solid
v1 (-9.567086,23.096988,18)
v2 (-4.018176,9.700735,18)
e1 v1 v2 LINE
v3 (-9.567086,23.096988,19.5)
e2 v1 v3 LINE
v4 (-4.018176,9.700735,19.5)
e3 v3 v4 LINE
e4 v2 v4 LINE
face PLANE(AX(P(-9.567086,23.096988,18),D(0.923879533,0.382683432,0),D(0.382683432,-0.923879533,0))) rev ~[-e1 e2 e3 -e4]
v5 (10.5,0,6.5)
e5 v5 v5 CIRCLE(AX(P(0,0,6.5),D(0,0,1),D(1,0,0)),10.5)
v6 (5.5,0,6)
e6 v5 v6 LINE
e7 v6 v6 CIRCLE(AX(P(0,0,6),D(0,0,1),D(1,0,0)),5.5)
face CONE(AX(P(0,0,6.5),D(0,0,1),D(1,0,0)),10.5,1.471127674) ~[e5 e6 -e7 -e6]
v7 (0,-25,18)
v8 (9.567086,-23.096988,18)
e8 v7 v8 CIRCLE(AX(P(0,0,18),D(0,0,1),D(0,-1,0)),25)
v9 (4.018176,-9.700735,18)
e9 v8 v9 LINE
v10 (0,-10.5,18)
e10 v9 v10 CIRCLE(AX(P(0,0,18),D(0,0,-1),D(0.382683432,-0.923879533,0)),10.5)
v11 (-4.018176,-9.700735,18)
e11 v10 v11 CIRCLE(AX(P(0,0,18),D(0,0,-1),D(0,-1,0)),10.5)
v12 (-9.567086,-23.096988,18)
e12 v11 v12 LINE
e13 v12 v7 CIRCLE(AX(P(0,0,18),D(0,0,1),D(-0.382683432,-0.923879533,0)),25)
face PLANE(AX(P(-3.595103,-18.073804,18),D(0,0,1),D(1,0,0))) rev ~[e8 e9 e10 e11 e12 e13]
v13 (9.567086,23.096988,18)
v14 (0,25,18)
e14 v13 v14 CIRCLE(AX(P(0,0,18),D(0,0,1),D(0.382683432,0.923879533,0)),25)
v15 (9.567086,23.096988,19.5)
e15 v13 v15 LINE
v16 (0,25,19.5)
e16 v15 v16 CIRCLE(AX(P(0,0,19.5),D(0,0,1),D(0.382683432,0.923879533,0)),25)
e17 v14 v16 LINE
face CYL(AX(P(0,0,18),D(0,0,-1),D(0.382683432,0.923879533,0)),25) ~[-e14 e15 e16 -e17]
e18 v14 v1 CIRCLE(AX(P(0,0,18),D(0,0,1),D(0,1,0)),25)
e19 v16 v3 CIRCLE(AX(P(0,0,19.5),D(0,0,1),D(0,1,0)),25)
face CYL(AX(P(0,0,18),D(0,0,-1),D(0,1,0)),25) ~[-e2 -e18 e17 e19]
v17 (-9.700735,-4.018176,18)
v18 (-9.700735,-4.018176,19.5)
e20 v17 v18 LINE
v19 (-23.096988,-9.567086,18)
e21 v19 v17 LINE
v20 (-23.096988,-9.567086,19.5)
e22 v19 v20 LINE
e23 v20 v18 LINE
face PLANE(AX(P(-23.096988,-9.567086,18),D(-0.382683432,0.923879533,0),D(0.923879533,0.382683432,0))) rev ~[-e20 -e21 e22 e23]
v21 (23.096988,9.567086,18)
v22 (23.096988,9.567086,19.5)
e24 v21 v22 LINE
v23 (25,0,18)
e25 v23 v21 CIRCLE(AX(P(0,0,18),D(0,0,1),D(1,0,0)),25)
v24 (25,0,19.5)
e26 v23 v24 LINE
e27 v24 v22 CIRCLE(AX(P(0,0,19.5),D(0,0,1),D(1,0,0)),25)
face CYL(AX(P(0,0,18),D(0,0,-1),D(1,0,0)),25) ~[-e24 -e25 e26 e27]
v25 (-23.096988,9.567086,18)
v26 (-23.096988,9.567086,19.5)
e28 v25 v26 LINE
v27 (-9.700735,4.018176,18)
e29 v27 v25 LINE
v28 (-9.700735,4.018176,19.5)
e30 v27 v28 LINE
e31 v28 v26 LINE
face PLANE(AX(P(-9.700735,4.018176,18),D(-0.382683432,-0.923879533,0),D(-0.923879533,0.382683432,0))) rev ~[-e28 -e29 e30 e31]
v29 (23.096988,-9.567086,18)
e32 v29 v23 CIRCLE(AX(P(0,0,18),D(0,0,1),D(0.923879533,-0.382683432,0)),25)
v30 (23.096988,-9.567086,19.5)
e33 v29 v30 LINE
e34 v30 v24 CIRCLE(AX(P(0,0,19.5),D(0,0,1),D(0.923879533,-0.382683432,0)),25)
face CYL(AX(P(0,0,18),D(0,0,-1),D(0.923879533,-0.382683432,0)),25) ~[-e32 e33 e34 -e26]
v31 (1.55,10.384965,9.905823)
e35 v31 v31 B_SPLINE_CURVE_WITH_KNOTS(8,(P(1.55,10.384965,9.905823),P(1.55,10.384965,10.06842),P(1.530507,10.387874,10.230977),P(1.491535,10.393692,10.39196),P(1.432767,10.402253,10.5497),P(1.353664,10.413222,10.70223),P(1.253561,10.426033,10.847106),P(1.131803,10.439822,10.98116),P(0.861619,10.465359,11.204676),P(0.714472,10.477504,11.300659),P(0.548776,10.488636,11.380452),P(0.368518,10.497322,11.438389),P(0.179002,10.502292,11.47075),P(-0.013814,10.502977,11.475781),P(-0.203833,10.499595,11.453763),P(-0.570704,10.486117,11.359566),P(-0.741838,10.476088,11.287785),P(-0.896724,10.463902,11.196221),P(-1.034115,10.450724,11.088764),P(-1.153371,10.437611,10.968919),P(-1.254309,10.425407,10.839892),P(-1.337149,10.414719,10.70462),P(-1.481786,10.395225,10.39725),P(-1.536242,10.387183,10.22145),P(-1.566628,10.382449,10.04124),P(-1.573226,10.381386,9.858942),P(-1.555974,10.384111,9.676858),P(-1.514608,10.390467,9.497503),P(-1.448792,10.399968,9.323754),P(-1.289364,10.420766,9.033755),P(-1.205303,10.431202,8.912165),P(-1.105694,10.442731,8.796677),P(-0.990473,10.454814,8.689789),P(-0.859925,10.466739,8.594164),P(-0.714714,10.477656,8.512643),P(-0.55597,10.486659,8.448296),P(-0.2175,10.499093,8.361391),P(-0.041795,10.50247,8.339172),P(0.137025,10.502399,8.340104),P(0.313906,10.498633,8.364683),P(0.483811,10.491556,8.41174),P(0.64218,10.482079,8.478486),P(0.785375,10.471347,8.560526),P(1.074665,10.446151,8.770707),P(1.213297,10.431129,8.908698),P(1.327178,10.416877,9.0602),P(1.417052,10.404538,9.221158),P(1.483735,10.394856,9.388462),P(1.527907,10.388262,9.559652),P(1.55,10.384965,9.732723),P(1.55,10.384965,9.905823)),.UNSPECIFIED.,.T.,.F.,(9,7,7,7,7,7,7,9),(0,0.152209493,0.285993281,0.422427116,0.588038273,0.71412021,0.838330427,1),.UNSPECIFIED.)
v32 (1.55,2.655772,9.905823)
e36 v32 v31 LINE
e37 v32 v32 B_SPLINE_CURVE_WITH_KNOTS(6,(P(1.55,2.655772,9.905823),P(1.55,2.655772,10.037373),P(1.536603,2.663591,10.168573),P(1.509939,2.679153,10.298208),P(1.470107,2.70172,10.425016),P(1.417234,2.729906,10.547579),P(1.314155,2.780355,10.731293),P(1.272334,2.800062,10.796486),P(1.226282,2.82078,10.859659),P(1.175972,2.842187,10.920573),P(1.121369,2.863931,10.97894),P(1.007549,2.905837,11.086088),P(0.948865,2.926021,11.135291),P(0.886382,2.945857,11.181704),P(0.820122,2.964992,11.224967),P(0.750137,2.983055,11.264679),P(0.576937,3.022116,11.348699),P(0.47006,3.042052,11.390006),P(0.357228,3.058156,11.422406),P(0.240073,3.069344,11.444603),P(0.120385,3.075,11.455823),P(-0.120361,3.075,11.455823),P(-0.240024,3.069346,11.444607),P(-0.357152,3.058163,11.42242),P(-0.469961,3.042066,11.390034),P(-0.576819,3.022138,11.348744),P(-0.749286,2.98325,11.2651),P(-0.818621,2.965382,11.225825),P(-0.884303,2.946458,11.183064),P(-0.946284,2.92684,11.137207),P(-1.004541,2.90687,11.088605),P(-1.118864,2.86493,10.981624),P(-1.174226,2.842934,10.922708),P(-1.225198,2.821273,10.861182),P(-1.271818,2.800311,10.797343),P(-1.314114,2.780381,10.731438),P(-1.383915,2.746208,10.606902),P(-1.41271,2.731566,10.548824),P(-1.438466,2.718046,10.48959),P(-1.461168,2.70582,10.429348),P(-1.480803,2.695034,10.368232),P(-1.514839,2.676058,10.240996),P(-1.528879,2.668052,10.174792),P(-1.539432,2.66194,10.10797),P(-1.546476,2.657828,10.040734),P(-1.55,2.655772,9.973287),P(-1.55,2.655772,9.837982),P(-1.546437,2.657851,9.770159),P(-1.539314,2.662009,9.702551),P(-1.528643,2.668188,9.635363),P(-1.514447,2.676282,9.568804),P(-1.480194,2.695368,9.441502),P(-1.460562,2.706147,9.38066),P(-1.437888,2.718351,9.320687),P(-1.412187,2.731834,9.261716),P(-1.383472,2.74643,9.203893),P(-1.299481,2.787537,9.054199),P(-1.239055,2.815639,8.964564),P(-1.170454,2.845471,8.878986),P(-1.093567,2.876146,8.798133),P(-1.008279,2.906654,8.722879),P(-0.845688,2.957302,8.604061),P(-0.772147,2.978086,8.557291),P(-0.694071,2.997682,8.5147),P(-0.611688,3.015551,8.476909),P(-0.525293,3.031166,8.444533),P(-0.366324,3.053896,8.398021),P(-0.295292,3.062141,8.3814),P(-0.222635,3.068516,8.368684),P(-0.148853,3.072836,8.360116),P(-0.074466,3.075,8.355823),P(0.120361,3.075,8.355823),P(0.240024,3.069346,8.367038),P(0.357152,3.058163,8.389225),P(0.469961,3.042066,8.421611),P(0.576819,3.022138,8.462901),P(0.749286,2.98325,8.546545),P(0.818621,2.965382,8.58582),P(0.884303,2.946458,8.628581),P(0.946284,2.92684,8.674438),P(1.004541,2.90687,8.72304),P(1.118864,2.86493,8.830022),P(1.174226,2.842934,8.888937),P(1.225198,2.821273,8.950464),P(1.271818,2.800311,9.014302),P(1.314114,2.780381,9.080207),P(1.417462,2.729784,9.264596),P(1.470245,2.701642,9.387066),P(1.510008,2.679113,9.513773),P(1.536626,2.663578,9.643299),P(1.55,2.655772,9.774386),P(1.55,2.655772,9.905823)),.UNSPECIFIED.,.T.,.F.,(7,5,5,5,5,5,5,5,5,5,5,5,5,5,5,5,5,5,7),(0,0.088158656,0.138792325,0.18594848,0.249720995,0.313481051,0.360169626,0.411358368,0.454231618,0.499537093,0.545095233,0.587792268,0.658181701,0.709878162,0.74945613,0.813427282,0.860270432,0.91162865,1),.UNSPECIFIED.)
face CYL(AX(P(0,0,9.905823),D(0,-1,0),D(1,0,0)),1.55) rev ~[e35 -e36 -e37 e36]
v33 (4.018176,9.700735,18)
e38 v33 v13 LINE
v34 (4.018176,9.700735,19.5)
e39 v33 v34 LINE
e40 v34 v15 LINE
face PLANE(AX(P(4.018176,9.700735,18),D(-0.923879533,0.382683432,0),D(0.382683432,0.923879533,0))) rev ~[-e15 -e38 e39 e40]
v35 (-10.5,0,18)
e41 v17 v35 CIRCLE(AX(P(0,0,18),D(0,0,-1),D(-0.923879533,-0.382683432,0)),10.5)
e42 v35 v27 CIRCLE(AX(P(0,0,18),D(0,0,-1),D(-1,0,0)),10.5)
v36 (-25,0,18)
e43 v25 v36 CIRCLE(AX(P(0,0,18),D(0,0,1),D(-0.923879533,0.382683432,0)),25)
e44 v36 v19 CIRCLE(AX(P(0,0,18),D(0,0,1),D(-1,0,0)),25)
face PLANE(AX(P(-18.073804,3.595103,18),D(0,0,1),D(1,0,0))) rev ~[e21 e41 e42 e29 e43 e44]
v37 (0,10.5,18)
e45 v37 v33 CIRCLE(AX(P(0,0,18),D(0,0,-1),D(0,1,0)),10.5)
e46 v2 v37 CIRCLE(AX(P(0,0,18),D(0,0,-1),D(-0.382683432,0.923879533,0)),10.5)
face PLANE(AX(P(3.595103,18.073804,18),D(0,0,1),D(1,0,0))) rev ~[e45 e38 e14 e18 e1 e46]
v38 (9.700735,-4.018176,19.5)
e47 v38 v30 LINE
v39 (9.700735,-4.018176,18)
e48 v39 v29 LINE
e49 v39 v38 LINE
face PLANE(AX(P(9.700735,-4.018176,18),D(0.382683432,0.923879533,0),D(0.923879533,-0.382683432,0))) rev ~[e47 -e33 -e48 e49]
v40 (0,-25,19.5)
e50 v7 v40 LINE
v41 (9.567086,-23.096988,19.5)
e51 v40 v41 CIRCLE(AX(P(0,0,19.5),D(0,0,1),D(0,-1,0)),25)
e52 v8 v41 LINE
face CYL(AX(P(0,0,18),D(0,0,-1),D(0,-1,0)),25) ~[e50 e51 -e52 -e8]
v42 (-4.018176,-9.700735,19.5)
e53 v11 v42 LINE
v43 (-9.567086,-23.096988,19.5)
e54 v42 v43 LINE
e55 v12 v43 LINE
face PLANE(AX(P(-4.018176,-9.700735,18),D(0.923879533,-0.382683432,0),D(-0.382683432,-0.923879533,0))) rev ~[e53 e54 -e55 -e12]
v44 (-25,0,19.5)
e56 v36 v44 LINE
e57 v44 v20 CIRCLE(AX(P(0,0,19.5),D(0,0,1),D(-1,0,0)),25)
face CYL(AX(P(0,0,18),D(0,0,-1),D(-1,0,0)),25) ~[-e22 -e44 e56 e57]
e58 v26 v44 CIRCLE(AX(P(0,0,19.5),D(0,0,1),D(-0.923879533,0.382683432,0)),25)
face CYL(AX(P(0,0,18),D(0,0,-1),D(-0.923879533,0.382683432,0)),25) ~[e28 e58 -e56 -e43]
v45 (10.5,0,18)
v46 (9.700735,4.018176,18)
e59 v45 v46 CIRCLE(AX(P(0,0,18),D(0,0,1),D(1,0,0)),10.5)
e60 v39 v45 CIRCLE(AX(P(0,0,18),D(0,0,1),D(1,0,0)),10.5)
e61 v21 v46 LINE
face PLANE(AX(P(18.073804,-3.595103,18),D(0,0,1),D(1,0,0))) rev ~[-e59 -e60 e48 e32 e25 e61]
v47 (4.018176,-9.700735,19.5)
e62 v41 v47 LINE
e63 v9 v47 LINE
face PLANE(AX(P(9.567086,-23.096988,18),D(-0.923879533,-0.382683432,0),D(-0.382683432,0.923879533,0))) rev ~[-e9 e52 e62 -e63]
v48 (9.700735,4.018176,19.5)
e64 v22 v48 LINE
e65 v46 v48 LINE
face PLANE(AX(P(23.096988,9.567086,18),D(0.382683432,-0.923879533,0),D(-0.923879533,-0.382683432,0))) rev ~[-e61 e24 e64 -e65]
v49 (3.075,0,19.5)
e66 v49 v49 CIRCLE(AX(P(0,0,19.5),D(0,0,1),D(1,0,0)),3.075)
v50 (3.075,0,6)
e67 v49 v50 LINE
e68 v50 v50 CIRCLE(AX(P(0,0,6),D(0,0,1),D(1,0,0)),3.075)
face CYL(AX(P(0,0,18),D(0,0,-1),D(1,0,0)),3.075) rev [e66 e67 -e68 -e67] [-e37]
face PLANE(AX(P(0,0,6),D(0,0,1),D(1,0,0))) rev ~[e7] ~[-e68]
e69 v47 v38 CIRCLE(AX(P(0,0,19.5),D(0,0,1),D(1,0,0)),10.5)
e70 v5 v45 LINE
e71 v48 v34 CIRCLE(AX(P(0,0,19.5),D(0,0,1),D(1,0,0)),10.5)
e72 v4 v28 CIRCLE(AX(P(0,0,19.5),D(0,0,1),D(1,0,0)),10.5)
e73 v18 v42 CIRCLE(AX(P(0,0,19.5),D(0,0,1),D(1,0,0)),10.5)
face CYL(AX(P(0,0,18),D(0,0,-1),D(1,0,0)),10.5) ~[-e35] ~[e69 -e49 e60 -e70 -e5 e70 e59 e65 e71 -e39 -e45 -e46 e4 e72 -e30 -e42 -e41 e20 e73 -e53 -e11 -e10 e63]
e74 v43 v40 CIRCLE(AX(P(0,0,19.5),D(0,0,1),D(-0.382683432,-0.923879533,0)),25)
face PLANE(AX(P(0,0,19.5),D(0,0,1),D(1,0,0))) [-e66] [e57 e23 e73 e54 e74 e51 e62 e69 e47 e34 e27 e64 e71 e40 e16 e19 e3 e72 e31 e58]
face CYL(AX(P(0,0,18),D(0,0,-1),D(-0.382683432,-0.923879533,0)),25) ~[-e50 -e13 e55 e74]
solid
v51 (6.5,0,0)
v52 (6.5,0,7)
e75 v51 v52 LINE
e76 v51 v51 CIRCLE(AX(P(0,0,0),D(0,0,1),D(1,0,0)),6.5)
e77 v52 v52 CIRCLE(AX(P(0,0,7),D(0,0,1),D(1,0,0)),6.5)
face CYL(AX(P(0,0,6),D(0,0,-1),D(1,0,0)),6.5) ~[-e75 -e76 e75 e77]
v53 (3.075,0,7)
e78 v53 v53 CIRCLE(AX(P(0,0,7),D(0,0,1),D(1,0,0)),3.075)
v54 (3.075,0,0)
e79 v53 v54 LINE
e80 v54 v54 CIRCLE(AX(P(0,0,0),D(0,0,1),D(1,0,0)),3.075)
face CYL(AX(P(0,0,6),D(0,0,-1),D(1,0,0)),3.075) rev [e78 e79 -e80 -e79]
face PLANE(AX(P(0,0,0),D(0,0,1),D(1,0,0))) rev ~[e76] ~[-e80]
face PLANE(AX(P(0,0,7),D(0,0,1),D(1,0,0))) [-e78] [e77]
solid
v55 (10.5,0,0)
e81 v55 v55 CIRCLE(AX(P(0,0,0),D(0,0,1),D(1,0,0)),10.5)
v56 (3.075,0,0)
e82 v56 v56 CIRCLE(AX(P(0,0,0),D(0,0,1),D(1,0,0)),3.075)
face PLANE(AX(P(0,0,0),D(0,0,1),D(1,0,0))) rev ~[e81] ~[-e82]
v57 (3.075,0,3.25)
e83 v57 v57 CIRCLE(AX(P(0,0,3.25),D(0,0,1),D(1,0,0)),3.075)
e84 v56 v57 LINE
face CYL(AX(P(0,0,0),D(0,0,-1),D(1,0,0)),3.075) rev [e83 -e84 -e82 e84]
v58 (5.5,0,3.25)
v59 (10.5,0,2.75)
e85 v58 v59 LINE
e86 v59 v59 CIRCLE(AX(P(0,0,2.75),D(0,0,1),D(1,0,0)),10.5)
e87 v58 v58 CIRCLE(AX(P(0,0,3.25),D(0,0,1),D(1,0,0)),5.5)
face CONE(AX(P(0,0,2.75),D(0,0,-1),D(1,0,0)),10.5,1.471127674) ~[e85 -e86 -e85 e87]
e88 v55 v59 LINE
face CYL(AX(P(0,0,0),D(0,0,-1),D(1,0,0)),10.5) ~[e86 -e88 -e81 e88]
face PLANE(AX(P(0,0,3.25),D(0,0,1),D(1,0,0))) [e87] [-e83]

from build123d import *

# Parameters (mm, degrees)
F0_R      = 10.5
F0_R_2    = 6.5
F0_R_3    = 3.075
F1_DEPTH  = 3.25
F2_DEPTH  = 6
F3_R      = 10.5
F3_R_2    = 6.5
F3_R_3    = 3.075
F4_DEPTH  = 12
F6_DEPTH  = 1.5
F7_DEPTH  = 1.5
F8_R      = 1.55
F9_DEPTH  = 20
F10_SIZE2 = 0.5
F10_SIZE  = 5
F11_SIZE2 = 5
F11_SIZE  = 0.5
F12_DEPTH = 1


with BuildPart() as f1:
    # F0 (on Top) → F1 (new body)
    with BuildSketch(Plane.XY):
        Circle(F0_R)
        Circle(F0_R_2, mode=Mode.SUBTRACT)
        Circle(F0_R_2)
        Circle(F0_R_3, mode=Mode.SUBTRACT)
    extrude(amount=F1_DEPTH)

    # F10
    f10_edges = [f1.edges().sort_by_distance(p)[0] for p in [
        (-10.5, 0, 3.25),
    ]]
    f10_side = f1.faces().sort_by_distance((-3.371985, 0, 3.25))[0]
    chamfer(f10_edges, length=F10_SIZE, length2=F10_SIZE2, reference=f10_side)


with BuildPart() as f2:
    # F0 (on Top) → F2 (new body)
    with BuildSketch(Plane.XY):
        Circle(F0_R_2)
        Circle(F0_R_3, mode=Mode.SUBTRACT)
    extrude(amount=F2_DEPTH)

    # F12 (add): a face of the model
    f12_faces = [f2.faces().sort_by_distance(p)[0] for p in [
        (-6.3161522369, 0, 6),
    ]]
    extrude(f12_faces, amount=F12_DEPTH)


with BuildPart() as f4:
    # F3 (on face) → F4 (new body)
    with BuildSketch(Plane.XY.offset(6)):
        Circle(F3_R)
        Circle(F3_R_2, mode=Mode.SUBTRACT)
        Circle(F3_R_2)
        Circle(F3_R_3, mode=Mode.SUBTRACT)
    extrude(amount=F4_DEPTH)

    # F5 (on face) → F6 (join)
    with BuildSketch(Plane.XY.offset(18)):
        with BuildLine():
            Line((-25, 0), (-10.5, 0))
            ThreePointArc((-10.5, 0), (-10.2982454442, 2.0484483812), (-9.7007350914, 4.0181760398))
            Line((-9.7007350914, 4.0181760398), (-23.0969883128, 9.5670858091))
            ThreePointArc((-23.0969883128, 9.5670858091), (-24.5196320101, 4.8772580504), (-25, 0))
        make_face()
        with BuildLine():
            ThreePointArc((-9.7007350914, -4.0181760398), (-10.2982454442, -2.0484483812), (-10.5, 0))
            Line((-10.5, 0), (-25, 0))
            ThreePointArc((-25, 0), (-24.5196320101, -4.8772580504), (-23.0969883128, -9.5670858091))
            Line((-23.0969883128, -9.5670858091), (-9.7007350914, -4.0181760398))
        make_face()
        with BuildLine():
            ThreePointArc((-9.5670858091, -23.0969883128), (-4.8772580504, -24.5196320101), (0, -25))
            Line((0, -25), (0, -10.5))
            ThreePointArc((0, -10.5), (-2.0484483812, -10.2982454442), (-4.0181760398, -9.7007350914))
            Line((-4.0181760398, -9.7007350914), (-9.5670858091, -23.0969883128))
        make_face()
        with BuildLine():
            ThreePointArc((0, -25), (4.8772580504, -24.5196320101), (9.5670858091, -23.0969883128))
            Line((9.5670858091, -23.0969883128), (4.0181760398, -9.7007350914))
            ThreePointArc((4.0181760398, -9.7007350914), (2.0484483812, -10.2982454442), (0, -10.5))
            Line((0, -10.5), (0, -25))
        make_face()
        with BuildLine():
            ThreePointArc((23.0969883128, -9.5670858091), (24.5196320101, -4.8772580504), (25, 0))
            Line((25, 0), (10.5, 0))
            ThreePointArc((10.5, 0), (10.2982454442, -2.0484483812), (9.7007350914, -4.0181760398))
            Line((9.7007350914, -4.0181760398), (23.0969883128, -9.5670858091))
        make_face()
        with BuildLine():
            Line((10.5, 0), (25, 0))
            ThreePointArc((25, 0), (24.5196320101, 4.8772580504), (23.0969883128, 9.5670858091))
            Line((23.0969883128, 9.5670858091), (9.7007350914, 4.0181760398))
            ThreePointArc((9.7007350914, 4.0181760398), (10.2982454442, 2.0484483812), (10.5, 0))
        make_face()
        with BuildLine():
            Line((4.0181760398, 9.7007350914), (9.5670858091, 23.0969883128))
            ThreePointArc((9.5670858091, 23.0969883128), (4.8772580504, 24.5196320101), (0, 25))
            Line((0, 25), (0, 10.5))
            ThreePointArc((0, 10.5), (2.0484483812, 10.2982454442), (4.0181760398, 9.7007350914))
        make_face()
        with BuildLine():
            Line((0, 10.5), (0, 25))
            ThreePointArc((0, 25), (-4.8772580504, 24.5196320101), (-9.5670858091, 23.0969883128))
            Line((-9.5670858091, 23.0969883128), (-4.0181760398, 9.7007350914))
            ThreePointArc((-4.0181760398, 9.7007350914), (-2.0484483812, 10.2982454442), (0, 10.5))
        make_face()
    extrude(amount=F6_DEPTH)

    # F7 (add): a face of the model
    f7_faces = [f4.faces().sort_by_distance(p)[0] for p in [
        (10.0069670767, 1.9905095115, 18),
    ]]
    extrude(f7_faces, amount=F7_DEPTH)

    # F8 (on Front) → F9 (cut)
    with BuildSketch(Plane.XZ):
        with Locations((0, 9.9058225751)):
            Circle(F8_R)
    extrude(amount=-F9_DEPTH, mode=Mode.SUBTRACT)

    # F11
    f11_edges = [f4.edges().sort_by_distance(p)[0] for p in [
        (-10.5, 0, 6),
    ]]
    f11_side = f4.faces().sort_by_distance((-10.5, 0, 12.75))[0]
    chamfer(f11_edges, length=F11_SIZE, length2=F11_SIZE2, reference=f11_side)


solid = Compound([f1.part, f2.part, f4.part])
